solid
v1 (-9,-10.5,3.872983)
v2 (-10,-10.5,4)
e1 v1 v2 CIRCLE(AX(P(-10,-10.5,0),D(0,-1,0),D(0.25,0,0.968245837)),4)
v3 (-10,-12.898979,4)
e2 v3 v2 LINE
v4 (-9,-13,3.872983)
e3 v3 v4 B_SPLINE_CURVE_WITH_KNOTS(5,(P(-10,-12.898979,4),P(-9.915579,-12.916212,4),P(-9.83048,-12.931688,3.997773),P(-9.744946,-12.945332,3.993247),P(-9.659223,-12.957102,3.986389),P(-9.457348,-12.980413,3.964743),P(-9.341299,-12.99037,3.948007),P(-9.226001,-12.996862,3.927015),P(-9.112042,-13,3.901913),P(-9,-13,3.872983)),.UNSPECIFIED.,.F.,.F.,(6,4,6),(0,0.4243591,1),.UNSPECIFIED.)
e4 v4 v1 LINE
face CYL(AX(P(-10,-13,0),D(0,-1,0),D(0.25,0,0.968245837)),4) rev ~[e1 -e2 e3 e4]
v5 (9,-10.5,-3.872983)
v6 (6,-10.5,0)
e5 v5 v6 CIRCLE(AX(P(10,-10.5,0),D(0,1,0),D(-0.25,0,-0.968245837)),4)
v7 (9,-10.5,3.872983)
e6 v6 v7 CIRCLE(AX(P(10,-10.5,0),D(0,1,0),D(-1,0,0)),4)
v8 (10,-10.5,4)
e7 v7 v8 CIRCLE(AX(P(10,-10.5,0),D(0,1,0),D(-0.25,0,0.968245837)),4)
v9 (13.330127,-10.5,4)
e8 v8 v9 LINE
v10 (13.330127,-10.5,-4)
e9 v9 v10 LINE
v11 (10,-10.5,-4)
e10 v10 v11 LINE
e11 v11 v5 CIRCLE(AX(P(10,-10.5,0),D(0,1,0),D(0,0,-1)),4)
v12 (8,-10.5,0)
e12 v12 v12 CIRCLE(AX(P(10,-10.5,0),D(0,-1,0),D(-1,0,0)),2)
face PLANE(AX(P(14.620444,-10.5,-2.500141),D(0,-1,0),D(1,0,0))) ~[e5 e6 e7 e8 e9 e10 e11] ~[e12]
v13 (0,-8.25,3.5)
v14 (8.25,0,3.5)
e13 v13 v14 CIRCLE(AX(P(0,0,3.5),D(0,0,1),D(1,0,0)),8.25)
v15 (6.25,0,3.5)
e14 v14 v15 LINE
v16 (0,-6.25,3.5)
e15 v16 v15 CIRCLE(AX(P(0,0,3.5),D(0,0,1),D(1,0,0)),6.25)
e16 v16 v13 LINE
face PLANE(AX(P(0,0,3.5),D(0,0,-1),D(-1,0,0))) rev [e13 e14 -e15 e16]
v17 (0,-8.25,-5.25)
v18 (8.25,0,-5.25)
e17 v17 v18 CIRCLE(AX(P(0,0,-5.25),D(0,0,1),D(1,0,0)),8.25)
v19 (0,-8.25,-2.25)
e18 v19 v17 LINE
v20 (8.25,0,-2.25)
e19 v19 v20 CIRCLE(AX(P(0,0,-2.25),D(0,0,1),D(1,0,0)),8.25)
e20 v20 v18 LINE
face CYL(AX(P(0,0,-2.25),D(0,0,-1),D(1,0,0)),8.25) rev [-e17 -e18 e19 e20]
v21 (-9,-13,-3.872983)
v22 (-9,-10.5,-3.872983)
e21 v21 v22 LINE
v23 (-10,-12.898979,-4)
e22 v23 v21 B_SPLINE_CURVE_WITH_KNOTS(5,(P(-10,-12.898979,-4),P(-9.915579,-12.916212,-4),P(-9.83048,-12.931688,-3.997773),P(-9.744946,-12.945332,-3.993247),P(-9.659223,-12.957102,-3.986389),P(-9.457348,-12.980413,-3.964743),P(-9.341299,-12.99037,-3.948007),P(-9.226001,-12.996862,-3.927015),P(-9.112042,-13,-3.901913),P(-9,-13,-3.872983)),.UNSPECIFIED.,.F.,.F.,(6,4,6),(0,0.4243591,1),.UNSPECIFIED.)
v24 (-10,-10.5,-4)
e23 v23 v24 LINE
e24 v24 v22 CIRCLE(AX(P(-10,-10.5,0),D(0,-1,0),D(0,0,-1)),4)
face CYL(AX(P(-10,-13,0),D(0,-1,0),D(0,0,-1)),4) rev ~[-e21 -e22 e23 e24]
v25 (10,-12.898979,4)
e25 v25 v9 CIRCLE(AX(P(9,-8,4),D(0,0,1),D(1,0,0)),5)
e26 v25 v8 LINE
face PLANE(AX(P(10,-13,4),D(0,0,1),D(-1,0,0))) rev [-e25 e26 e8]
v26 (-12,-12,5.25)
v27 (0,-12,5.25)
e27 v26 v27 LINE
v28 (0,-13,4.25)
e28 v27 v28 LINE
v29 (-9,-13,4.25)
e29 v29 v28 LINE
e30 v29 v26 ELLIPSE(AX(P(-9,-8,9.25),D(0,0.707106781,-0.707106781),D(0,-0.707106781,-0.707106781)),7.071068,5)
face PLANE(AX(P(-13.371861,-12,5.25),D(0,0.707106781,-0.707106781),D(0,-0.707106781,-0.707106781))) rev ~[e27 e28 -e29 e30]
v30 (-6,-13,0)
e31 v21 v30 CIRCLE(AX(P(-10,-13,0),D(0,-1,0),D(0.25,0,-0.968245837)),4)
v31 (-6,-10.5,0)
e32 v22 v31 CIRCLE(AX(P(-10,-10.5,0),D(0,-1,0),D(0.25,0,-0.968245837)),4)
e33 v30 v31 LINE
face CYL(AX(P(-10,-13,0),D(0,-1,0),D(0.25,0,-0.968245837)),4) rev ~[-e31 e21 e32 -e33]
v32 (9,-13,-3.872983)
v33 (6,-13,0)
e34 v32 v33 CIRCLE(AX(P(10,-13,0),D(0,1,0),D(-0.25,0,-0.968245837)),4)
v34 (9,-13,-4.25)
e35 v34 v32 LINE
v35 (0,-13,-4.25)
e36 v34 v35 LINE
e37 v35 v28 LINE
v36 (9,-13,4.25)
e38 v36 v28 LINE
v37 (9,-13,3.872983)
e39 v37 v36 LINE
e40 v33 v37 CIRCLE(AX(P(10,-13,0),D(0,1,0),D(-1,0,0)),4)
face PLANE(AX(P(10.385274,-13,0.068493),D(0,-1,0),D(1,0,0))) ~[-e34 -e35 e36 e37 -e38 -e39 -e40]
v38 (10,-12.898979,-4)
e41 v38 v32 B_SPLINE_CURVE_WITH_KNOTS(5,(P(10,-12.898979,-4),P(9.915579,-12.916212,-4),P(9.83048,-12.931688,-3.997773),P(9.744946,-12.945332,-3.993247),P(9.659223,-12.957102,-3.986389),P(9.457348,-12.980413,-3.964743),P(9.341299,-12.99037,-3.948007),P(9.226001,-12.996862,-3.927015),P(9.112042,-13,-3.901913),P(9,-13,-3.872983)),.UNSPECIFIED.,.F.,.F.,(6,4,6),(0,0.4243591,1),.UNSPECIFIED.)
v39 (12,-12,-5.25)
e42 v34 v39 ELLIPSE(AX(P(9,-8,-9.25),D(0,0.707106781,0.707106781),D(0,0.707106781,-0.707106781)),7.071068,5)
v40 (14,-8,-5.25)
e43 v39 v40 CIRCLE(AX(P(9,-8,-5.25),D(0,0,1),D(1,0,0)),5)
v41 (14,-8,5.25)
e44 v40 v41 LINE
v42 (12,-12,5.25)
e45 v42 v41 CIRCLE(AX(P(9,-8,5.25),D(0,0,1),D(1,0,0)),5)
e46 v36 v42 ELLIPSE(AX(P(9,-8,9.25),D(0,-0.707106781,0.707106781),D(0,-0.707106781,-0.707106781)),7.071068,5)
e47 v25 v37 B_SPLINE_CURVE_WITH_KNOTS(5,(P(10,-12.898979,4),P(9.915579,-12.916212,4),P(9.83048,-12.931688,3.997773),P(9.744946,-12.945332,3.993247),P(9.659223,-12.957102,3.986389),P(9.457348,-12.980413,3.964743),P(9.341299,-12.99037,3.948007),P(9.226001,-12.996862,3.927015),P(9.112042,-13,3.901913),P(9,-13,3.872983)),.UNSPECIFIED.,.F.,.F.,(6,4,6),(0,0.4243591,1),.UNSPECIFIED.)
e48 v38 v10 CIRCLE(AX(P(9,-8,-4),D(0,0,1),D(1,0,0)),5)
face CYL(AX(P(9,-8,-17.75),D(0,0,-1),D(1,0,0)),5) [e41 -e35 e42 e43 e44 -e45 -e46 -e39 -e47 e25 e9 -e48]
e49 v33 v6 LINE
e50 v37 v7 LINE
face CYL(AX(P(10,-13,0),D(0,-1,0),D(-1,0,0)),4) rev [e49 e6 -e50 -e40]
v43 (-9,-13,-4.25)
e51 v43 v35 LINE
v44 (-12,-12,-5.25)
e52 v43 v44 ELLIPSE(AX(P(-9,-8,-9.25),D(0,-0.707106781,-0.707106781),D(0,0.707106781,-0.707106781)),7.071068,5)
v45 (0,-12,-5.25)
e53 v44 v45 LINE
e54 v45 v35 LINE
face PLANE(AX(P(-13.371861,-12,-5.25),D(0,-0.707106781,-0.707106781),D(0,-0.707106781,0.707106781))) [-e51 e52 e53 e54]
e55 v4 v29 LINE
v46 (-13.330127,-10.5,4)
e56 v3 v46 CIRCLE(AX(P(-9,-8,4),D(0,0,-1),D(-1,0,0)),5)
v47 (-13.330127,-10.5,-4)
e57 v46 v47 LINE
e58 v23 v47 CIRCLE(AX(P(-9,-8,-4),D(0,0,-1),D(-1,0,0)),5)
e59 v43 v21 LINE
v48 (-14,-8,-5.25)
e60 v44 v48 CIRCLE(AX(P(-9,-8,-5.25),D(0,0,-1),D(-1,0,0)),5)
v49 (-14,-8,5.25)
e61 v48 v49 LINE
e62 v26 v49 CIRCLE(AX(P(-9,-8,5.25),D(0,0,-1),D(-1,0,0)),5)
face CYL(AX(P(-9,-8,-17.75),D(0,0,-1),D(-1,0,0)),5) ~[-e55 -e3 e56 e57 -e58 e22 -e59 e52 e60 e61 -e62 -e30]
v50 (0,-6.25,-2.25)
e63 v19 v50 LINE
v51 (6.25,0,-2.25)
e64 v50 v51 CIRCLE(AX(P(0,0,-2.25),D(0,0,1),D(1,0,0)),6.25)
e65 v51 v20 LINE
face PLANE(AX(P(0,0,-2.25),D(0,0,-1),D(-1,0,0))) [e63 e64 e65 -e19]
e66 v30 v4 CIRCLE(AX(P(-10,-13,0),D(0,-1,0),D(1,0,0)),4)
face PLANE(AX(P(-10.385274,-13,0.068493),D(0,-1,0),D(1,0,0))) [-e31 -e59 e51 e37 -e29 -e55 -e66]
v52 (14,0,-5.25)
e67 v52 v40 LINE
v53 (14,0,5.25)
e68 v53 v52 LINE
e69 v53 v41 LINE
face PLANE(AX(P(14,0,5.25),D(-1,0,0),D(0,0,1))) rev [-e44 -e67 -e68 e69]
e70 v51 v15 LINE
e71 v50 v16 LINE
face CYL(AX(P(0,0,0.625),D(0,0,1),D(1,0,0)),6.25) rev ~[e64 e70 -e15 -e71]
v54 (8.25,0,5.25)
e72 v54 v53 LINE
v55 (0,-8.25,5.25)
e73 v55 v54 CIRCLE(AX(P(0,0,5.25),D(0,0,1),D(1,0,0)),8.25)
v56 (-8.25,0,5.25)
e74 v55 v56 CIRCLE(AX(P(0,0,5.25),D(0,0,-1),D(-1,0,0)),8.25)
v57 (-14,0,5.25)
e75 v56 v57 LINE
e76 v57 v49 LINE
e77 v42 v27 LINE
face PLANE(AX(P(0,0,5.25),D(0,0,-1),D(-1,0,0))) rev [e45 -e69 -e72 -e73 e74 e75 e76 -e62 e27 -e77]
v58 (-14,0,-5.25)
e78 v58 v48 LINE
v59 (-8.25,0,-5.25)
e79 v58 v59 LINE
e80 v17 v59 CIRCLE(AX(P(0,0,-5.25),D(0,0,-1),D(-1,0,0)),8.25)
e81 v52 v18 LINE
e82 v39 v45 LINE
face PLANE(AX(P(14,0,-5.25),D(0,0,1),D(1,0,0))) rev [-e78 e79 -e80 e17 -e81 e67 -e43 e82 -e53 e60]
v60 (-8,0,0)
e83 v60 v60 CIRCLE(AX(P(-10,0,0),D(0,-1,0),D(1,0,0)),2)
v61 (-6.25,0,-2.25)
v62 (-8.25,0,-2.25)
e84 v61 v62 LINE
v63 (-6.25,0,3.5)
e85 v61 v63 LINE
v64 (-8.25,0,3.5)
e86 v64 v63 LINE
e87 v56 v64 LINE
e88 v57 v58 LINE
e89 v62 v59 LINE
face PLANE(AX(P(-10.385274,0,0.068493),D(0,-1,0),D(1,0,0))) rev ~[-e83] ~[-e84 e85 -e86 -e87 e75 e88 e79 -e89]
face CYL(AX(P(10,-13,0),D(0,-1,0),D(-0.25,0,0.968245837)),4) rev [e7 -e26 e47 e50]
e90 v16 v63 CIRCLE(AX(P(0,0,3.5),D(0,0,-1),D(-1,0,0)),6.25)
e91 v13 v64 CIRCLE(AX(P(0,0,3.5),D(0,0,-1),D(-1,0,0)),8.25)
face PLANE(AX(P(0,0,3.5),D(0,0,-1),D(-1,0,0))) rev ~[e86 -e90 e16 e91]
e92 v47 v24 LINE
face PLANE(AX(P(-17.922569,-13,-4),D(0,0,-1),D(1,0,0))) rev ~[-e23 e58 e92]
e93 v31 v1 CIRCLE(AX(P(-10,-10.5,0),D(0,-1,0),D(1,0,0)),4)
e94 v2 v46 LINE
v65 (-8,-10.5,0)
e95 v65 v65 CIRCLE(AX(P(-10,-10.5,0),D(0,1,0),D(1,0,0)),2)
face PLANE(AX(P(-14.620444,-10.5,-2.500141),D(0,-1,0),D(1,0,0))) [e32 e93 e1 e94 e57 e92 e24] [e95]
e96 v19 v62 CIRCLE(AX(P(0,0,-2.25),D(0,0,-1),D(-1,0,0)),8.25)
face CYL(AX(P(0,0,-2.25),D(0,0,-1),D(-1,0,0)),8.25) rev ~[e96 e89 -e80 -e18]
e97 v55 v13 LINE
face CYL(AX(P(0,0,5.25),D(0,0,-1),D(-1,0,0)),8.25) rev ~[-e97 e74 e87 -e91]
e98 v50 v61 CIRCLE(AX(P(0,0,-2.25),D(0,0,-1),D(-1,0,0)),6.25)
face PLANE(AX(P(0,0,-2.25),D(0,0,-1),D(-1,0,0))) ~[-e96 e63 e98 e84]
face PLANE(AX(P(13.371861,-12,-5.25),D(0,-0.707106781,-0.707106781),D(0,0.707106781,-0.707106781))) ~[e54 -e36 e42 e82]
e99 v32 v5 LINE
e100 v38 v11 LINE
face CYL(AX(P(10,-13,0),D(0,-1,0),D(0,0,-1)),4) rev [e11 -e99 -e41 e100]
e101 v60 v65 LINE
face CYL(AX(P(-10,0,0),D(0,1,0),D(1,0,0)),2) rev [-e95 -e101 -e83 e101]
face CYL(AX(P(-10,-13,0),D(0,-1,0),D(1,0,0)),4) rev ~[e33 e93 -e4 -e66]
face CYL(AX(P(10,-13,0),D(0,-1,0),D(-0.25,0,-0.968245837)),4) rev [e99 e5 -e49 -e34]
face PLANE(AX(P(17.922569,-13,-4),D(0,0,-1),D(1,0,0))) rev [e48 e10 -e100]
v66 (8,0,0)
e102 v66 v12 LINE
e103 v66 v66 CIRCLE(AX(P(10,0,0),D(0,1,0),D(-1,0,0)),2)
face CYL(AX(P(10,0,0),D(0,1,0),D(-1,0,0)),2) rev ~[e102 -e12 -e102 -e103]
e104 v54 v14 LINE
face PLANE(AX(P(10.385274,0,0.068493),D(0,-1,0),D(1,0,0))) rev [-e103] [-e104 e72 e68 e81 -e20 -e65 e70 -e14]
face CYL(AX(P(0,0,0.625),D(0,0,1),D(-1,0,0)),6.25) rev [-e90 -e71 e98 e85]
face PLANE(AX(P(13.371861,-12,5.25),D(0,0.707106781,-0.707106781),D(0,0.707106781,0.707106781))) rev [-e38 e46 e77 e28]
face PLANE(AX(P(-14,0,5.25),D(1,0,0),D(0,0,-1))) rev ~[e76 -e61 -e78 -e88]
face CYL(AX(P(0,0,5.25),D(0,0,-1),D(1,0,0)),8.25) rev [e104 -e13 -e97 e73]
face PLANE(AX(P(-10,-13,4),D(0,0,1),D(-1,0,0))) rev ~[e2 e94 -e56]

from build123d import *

# Parameters (mm, degrees)
F0_R        = 2
F0_W        = 6.25
F0_H        = 5.75
F1_DEPTH    = 13
F3_DEPTH    = 25
F4_T1_DEPTH = 35.5
F6_DEPTH    = 2.5
F7_T1_DEPTH = 15.9435440675


# Not quite as in the source:
# - a fillet or chamfer that OpenCascade refuses, or shapes differently, is made with other operations: its cross-section is extruded or revolved along the edge and cut away or added


with BuildPart() as f1:
    # F0 (on Front) → F1 (new body)
    with BuildSketch(Plane.XZ):
        Polygon((-8.25, 3.5), (-8.25, 5.25), (-14, 5.25), (-14, -5.25), (-8.25, -5.25), (-8.25, -2.25), (-6.25, -2.25), (-6.25, 3.5), align=None)
        with Locations((-10, 0)):
            Circle(F0_R, mode=Mode.SUBTRACT)
        with Locations((-10, 0)):
            Circle(F0_R)
        Polygon((0, 3.5), (0, 5.25), (-8.25, 5.25), (-8.25, 3.5), (-6.25, 3.5), align=None)
        with Locations((-3.125, 0.625)):
            Rectangle(F0_W, F0_H)
        Polygon((0, -5.25), (0, -2.25), (-6.25, -2.25), (-8.25, -2.25), (-8.25, -5.25), align=None)
    extrude(amount=F1_DEPTH)

    # F0 (on Front) → F2 (revolve, cut)
    with BuildSketch(Plane.XZ):
        Polygon((0, 3.5), (0, 5.25), (-8.25, 5.25), (-8.25, 3.5), (-6.25, 3.5), align=None)
        with Locations((-3.125, 0.625)):
            Rectangle(F0_W, F0_H)
        Polygon((0, -5.25), (0, -2.25), (-6.25, -2.25), (-8.25, -2.25), (-8.25, -5.25), align=None)
    revolve(axis=Axis((0, 0, 0), (0, 0, -1)), mode=Mode.SUBTRACT)

    # F0 (on Front) → F3 (cut)
    with BuildSketch(Plane.XZ):
        with Locations((-10, 0)):
            Circle(F0_R)
    extrude(amount=F3_DEPTH, mode=Mode.SUBTRACT)

    # F4: fillet of radius 5 on 1 edges, made by hand

    # F4_s2 → F4_t1 (cut)
    with BuildSketch(Plane.XY.offset(-17.75)):
        with BuildLine():
            ThreePointArc((-14, -8), (-12.5355339059, -11.5355339059), (-9, -13))
            Line((-9, -13), (-14, -13))
            Line((-14, -13), (-14, -8))
        make_face()
    extrude(amount=F4_T1_DEPTH, mode=Mode.SUBTRACT)

    # F5 (on face) → F6 (cut)
    with BuildSketch(Plane.XZ.offset(13)):
        with BuildLine():
            Line((-17.9225690663, -4), (-10, -4))
            ThreePointArc((-10, -4), (-12.8284271247, -2.8284271247), (-14, 0))
            Line((-14, 0), (-17.9225690663, 0))
            Line((-17.9225690663, 0), (-17.9225690663, -4))
        make_face()
        with BuildLine():
            ThreePointArc((-14, 0), (-12.8284271247, 2.8284271247), (-10, 4))
            Line((-10, 4), (-17.9225690663, 4))
            Line((-17.9225690663, 4), (-17.9225690663, 0))
            Line((-17.9225690663, 0), (-14, 0))
        make_face()
        with BuildLine():
            Line((-10, 0), (-10, 4))
            ThreePointArc((-10, 4), (-12.8284271247, 2.8284271247), (-14, 0))
            Line((-14, 0), (-10, 0))
        make_face()
        with BuildLine():
            ThreePointArc((-9, -3.8729833462), (-6.8377223398, -2.4494897428), (-6, 0))
            ThreePointArc((-6, 0), (-6.8377223398, 2.4494897428), (-9, 3.8729833462))
            Line((-9, 3.8729833462), (-9, 1.7320508076))
            ThreePointArc((-9, 1.7320508076), (-8.2679491924, 1), (-8, 0))
            ThreePointArc((-8, 0), (-8.2679491924, -1), (-9, -1.7320508076))
            Line((-9, -1.7320508076), (-9, -3.8729833462))
        make_face()
        with BuildLine():
            Line((-9, 1.7320508076), (-9, 3.8729833462))
            ThreePointArc((-9, 3.8729833462), (-9.4959828301, 3.9681187851), (-10, 4))
            Line((-10, 4), (-10, 0))
            Line((-10, 0), (-10, -4))
            ThreePointArc((-10, -4), (-9.4959828301, -3.9681187851), (-9, -3.8729833462))
            Line((-9, -3.8729833462), (-9, -1.7320508076))
            ThreePointArc((-9, -1.7320508076), (-8.2679491924, -1), (-8, 0))
            ThreePointArc((-8, 0), (-8.2679491924, 1), (-9, 1.7320508076))
        make_face()
        with BuildLine():
            ThreePointArc((-14, 0), (-12.8284271247, -2.8284271247), (-10, -4))
            Line((-10, -4), (-10, 0))
            Line((-10, 0), (-14, 0))
        make_face()
    extrude(amount=-F6_DEPTH, mode=Mode.SUBTRACT)

    # F7: chamfer of 1 on 2 edges, made by hand

    # F7_s2 → F7_t1 (cut)
    with BuildSketch(Plane.YZ.offset(-13.3718610795)):
        Polygon((-12, -5.25), (-13, -4.25), (-13, -5.25), align=None)
        Polygon((-12, 5.25), (-13, 4.25), (-13, 5.25), align=None)
    extrude(amount=F7_T1_DEPTH, mode=Mode.SUBTRACT)

    # F8: F1 across face


with BuildPart() as f1_1:
    add(f1.part)
    add(f1.part.mirror(Plane(origin=(0, -9.948326432, 0.119047619), x_dir=(0, 1, 0), z_dir=(1, 0, 0))))


solid = f1_1.part
